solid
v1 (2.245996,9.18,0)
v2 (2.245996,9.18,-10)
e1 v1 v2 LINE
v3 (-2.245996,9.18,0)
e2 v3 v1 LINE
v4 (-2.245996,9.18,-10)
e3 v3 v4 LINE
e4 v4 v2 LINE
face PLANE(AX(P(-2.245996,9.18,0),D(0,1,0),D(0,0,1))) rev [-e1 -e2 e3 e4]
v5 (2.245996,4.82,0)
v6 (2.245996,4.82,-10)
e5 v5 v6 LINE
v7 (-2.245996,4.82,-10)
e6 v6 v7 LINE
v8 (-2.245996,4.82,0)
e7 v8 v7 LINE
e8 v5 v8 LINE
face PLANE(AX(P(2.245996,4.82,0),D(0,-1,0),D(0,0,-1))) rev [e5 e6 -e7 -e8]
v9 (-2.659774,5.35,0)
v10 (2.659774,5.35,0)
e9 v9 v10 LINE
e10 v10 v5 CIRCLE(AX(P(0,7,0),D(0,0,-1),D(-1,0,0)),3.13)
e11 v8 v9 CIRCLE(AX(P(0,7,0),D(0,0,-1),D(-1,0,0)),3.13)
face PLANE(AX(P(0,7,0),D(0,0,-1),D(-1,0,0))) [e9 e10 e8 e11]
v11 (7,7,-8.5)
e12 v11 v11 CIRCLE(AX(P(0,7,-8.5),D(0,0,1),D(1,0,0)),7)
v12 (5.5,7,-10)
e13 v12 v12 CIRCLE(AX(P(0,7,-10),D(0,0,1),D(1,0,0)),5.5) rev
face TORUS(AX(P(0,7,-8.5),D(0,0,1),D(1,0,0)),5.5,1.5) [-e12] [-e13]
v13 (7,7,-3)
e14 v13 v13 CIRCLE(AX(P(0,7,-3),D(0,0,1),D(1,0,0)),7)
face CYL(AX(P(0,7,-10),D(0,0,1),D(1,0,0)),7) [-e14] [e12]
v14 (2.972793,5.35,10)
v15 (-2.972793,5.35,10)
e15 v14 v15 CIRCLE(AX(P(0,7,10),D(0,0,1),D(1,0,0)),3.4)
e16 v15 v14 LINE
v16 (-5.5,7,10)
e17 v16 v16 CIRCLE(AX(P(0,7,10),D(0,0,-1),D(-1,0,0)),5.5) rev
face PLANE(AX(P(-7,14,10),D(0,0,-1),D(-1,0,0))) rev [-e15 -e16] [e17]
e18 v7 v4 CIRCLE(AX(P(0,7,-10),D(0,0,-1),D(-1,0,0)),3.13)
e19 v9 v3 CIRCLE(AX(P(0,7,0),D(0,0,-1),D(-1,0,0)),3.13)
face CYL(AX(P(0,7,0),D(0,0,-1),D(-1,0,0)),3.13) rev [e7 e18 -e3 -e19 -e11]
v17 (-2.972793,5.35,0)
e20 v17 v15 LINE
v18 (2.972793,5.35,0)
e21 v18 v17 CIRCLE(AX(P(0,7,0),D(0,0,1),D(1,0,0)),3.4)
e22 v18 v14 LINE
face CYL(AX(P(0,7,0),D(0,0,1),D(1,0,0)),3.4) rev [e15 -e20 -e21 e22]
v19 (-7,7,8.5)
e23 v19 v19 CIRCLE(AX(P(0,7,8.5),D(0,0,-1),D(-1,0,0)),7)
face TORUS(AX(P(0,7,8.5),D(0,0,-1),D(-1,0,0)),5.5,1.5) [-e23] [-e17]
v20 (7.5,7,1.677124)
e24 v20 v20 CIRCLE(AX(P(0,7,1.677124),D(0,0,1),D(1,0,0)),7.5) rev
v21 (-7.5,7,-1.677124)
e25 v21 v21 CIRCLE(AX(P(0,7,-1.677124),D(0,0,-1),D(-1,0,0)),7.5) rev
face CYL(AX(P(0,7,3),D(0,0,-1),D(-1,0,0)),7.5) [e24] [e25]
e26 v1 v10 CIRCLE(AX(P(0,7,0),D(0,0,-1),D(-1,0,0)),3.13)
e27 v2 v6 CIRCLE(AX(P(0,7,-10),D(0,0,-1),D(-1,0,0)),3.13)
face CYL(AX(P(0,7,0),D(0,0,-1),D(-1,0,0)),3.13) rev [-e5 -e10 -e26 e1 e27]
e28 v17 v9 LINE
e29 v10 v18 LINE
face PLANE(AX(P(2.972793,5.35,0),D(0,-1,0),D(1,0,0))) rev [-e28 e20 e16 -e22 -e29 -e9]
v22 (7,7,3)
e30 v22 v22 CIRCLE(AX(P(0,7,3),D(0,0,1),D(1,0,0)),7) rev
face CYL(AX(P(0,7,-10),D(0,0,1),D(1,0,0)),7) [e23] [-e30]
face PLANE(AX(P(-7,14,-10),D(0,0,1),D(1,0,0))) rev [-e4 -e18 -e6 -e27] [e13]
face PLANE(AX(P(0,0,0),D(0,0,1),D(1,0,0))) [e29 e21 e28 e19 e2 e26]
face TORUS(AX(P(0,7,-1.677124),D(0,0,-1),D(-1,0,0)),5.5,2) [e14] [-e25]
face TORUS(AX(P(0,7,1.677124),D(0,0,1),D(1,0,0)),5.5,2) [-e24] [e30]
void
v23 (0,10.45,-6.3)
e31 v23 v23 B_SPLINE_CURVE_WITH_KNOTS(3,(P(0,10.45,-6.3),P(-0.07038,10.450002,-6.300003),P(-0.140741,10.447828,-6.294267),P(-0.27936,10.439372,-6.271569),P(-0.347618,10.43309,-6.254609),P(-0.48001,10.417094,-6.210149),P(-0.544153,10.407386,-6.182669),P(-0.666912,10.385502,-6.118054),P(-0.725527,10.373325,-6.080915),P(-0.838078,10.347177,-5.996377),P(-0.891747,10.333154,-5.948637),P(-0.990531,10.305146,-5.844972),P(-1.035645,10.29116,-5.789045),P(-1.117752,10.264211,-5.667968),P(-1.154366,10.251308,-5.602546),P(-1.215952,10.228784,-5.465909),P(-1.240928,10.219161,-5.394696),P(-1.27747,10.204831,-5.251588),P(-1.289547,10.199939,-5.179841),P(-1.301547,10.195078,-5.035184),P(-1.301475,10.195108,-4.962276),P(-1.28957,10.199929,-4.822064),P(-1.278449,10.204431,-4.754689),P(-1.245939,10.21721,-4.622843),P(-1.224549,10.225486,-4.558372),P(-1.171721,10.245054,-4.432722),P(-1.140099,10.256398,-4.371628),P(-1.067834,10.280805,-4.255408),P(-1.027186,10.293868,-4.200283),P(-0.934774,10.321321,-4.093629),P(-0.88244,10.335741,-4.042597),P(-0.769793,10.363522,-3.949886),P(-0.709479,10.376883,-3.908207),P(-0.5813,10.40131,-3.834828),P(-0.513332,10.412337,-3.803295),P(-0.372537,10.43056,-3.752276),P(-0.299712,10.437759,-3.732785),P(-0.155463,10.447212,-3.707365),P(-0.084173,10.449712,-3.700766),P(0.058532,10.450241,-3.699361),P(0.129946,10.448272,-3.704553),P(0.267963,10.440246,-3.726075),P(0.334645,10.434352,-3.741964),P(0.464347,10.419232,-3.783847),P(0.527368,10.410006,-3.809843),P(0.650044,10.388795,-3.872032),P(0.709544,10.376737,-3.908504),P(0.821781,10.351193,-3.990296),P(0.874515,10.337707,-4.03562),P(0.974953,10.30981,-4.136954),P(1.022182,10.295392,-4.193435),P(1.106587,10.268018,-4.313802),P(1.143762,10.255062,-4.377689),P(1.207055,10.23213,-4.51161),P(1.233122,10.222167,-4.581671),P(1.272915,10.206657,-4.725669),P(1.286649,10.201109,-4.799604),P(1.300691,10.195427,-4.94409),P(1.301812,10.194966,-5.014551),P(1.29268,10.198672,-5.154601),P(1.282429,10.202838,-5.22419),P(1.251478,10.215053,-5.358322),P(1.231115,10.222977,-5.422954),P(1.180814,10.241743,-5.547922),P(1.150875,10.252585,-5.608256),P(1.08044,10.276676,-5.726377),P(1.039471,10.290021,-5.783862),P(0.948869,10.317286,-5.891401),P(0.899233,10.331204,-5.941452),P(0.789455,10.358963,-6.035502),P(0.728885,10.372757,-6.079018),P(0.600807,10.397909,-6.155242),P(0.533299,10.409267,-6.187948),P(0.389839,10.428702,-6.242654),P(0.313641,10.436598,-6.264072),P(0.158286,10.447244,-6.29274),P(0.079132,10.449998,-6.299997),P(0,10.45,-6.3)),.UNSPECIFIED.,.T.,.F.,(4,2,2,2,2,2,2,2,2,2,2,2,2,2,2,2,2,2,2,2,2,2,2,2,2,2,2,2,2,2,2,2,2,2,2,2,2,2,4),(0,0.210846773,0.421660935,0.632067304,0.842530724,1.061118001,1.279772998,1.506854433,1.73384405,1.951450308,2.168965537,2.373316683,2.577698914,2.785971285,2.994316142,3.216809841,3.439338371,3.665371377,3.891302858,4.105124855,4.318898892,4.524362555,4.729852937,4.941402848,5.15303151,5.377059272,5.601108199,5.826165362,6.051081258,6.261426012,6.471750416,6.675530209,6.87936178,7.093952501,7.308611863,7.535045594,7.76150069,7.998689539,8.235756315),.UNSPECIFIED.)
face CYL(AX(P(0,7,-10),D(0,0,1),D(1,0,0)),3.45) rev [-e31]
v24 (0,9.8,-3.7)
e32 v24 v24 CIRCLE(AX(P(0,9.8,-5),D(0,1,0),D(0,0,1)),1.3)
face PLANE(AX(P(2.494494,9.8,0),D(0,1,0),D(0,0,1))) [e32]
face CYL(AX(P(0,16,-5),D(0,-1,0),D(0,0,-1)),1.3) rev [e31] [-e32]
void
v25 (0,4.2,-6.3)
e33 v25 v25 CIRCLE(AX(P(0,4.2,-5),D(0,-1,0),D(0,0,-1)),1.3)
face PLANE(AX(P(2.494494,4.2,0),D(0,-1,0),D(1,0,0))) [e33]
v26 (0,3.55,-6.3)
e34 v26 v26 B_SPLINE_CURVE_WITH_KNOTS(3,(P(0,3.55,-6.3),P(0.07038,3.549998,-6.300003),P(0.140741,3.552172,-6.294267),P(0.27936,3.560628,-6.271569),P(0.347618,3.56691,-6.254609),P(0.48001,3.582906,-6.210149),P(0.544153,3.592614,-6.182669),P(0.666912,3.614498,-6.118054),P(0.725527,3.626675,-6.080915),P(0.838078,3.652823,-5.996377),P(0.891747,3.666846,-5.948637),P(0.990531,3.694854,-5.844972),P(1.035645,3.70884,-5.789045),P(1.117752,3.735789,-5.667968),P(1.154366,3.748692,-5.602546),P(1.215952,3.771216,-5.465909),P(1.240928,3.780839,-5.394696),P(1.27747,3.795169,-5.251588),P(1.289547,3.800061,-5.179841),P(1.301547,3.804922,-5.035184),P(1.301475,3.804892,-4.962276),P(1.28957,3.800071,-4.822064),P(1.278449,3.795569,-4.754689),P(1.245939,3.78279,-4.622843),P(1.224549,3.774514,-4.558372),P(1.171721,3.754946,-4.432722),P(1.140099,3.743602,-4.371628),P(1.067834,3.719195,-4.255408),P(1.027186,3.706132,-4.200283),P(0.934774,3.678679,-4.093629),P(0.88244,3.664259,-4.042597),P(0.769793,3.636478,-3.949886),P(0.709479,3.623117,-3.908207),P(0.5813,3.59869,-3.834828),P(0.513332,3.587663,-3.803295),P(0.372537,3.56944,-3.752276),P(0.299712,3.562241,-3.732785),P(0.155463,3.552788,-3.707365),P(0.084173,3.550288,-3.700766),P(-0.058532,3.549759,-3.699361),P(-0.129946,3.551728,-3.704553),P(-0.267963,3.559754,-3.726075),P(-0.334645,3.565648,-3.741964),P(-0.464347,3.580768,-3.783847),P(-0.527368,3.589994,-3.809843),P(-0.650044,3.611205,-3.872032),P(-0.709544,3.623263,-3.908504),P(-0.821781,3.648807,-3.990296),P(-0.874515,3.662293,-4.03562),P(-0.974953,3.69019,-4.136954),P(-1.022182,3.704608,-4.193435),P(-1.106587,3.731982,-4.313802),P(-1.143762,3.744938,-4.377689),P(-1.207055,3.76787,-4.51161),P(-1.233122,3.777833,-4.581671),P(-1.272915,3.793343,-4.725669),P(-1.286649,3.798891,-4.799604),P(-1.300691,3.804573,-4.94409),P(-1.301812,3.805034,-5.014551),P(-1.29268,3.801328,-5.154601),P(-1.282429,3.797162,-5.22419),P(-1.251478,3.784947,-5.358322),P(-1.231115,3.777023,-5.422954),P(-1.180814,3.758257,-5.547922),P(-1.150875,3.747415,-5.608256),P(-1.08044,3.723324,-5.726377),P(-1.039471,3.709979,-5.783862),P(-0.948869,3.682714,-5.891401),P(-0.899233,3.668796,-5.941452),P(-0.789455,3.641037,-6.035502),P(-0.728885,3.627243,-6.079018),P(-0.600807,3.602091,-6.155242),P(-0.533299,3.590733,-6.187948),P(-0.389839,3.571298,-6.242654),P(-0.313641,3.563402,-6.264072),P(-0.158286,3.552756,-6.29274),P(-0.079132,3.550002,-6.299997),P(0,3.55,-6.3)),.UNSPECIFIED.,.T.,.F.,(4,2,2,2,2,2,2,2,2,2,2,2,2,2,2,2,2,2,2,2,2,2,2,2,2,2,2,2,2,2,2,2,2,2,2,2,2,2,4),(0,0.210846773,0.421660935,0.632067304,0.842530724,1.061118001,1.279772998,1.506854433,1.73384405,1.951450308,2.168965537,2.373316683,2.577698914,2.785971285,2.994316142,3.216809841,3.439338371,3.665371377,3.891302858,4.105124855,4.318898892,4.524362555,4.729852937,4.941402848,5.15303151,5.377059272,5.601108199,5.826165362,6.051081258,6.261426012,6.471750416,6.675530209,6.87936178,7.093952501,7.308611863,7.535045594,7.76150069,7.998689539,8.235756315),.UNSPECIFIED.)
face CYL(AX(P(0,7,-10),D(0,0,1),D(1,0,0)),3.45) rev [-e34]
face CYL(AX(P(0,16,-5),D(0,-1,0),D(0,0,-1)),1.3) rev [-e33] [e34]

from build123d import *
from build123d.topology import SkipClean

# Parameters (mm, degrees)
ESBO_O1_W                  = 14
ESBO_O1_H                  = 20
ESBO_O1_R                  = 1.25
RESSALTO_EXTRUS_O1_DEPTH   = 14
ESBO_O6_R                  = 2.75
CORTE_EXTRUS_O3_DEPTH      = 10
CORTE_EXTRUS_O5_DEPTH      = 10
CORTE_EXTRUS_O5_DEPTH_BACK = 10
ESBO_O3_R                  = 1.25
ESBO_O8_R                  = 3.05
CORTE_EXTRUS_O6_DEPTH      = 10
ESBO_O9_OUTSIDE_W          = 21.628
ESBO_O9_OUTSIDE_H          = 21.628
ESBO_O9_OUTSIDE_R          = 7
CORTE_EXTRUS_O7_DEPTH      = 26.396850332
RESSALTO_EXTRUS_O2_START   = -6.122497316
RESSALTO_EXTRUS_O2_DEPTH   = 2.244994532
RESSALTO_EXTRUS_O3_DEPTH   = 10
ESBO_O13_R                 = 1.3
CORTE_EXTRUS_O8_DEPTH      = 16
RESSALTO_EXTRUS_O4_DEPTH   = 10
ESBO_O15_R                 = 1.3
CORTE_EXTRUS_O9_DEPTH      = 7
ESBO_O16_R                 = 7.5
ESBO_O16_R_2               = 7
RESSALTO_EXTRUS_O5_DEPTH   = 3
FILETE2_R                  = 2
FILETE3_R                  = 2
RESSALTO_EXTRUS_O6_START   = 10
RESSALTO_EXTRUS_O6_DEPTH   = 10
CORTE_EXTRUS_O11_DEPTH     = 10
CORTE_EXTRUS_O12_DEPTH     = 10
RESSALTO_EXTRUS_O8_DEPTH   = 10
RESSALTO_EXTRUS_O9_DEPTH   = 10
RESSALTO_EXTRUS_O10_DEPTH  = 10
ESBO_O26_R                 = 7
ESBO_O26_R_2               = 3.45
RESSALTO_EXTRUS_O11_DEPTH  = 20
FILETE4_R                  = 1.5
FILETE5_R                  = 1.5
ESBO_O27_W                 = 5.34202784
ESBO_O27_H                 = 3.157877353
RESSALTO_EXTRUS_O12_DEPTH  = 8


# Read off the part's stored shape, not the designer's step: Ressalto-extrusão2
with BuildPart() as part:
    # Esboço1 → Ressalto-extrusão1 (new body)
    with BuildSketch(Plane(origin=(0, 0, 0), x_dir=(1, 0, 0), z_dir=(0, 1, 0))):
        Rectangle(ESBO_O1_W, ESBO_O1_H)
        with Locations(Location((0, 5, 0), (0, 0, 270))):
            Circle(ESBO_O1_R, mode=Mode.SUBTRACT)
    extrude(amount=RESSALTO_EXTRUS_O1_DEPTH)

    # Esboço6 → Corte-extrusão3 (cut)
    with BuildSketch(Plane(origin=(0, 0, -10), x_dir=(-1, 0, 0), z_dir=(0, 0, -1))):
        with Locations((0, 7)):
            Circle(ESBO_O6_R)
    extrude(amount=-CORTE_EXTRUS_O3_DEPTH, mode=Mode.SUBTRACT)

    # Esboço3 → Corte-extrusão5 (cut, two sides: drawn at the far end of the back side and taken through both)
    with BuildSketch(Plane(origin=(0, 0, 0), x_dir=(1, 0, 0), z_dir=(0, 1, 0)).offset(-CORTE_EXTRUS_O5_DEPTH_BACK)):
        with Locations(Location((0, -5, 0), (0, 0, 270))):
            Circle(ESBO_O3_R)
    extrude(amount=CORTE_EXTRUS_O5_DEPTH + CORTE_EXTRUS_O5_DEPTH_BACK, mode=Mode.SUBTRACT)

    # Esboço8 → Corte-extrusão6 (cut)
    with BuildSketch(Plane.XY.offset(10)):
        with Locations((0, 7)):
            Circle(ESBO_O8_R)
    extrude(amount=-CORTE_EXTRUS_O6_DEPTH, mode=Mode.SUBTRACT)

    # Esboço9 outside → Corte-extrusão7 (cut, through all)
    with BuildSketch(Plane.XY.offset(10)):
        with Locations((0, 7)):
            Rectangle(ESBO_O9_OUTSIDE_W, ESBO_O9_OUTSIDE_H)
        with Locations((0, 7)):
            Circle(ESBO_O9_OUTSIDE_R, mode=Mode.SUBTRACT)
    extrude(amount=-CORTE_EXTRUS_O7_DEPTH, mode=Mode.SUBTRACT)

    # Ressalto-extrusão2 outline → Ressalto-extrusão2 (add)
    with SkipClean():  # the faces are left unmerged after this step: merging them gives an invalid solid
        with BuildSketch(Plane.XY.offset(10).offset(RESSALTO_EXTRUS_O2_START)):
            with BuildLine():
                ThreePointArc((0.55, 10), (2.343074903, 8.952562419), (3.05, 7))
                Line((3.05, 7), (7, 7))
                ThreePointArc((7, 7), (0, 14), (-7, 7))
                Line((-7, 7), (-3.05, 7))
                ThreePointArc((-3.05, 7), (-2.343074903, 8.952562419), (-0.55, 10))
                ThreePointArc((-0.55, 10), (0, 10.05), (0.55, 10))
            make_face()
        extrude(amount=RESSALTO_EXTRUS_O2_DEPTH)

    # Esboço11 → Ressalto-extrusão3 (add)
    with SkipClean():  # the faces are left unmerged after this step: merging them gives an invalid solid
        with BuildSketch(Plane(origin=(0, 0, -10), x_dir=(-1, 0, 0), z_dir=(0, 0, -1))):
            with BuildLine():
                Line((2.079062289, 5.2), (-2.079062289, 5.2))
                ThreePointArc((-2.079062289, 5.2), (0, 4.25), (2.079062289, 5.2))
            make_face()
            with BuildLine():
                ThreePointArc((2.079062289, 8.8), (0, 9.75), (-2.079062289, 8.8))
                Line((-2.079062289, 8.8), (2.079062289, 8.8))
            make_face()
        extrude(amount=-RESSALTO_EXTRUS_O3_DEPTH)

    # Esboço13 → Corte-extrusão8 (cut)
    with BuildSketch(Plane(origin=(0, 0, 0), x_dir=(1, 0, 0), z_dir=(0, 1, 0))):
        with Locations(Location((0, 5, 0), (0, 0, 90))):
            Circle(ESBO_O13_R)
    extrude(amount=CORTE_EXTRUS_O8_DEPTH, mode=Mode.SUBTRACT)

    # Esboço14 → Ressalto-extrusão4 (add)
    with BuildSketch(Plane.XY.offset(10)):
        with BuildLine():
            Line((0, 3.95), (0, 4.95))
            Line((0, 4.95), (-2.258317958, 4.95))
            ThreePointArc((-2.258317958, 4.95), (-1.234908904, 4.211183047), (0, 3.95))
        make_face()
        with BuildLine():
            Line((2.258317958, 4.95), (0, 4.95))
            Line((0, 4.95), (0, 3.95))
            ThreePointArc((0, 3.95), (1.234908904, 4.211183047), (2.258317958, 4.95))
        make_face()
    extrude(amount=-RESSALTO_EXTRUS_O4_DEPTH)

    # Esboço15 → Corte-extrusão9 (cut)
    with BuildSketch(Plane(origin=(0, 0, 0), x_dir=(1, 0, 0), z_dir=(0, 1, 0))):
        with Locations(Location((0, -5, 0), (0, 0, 90))):
            Circle(ESBO_O15_R)
    extrude(amount=CORTE_EXTRUS_O9_DEPTH, mode=Mode.SUBTRACT)

    # Esboço16 → Ressalto-extrusão5 (add, symmetric)
    with BuildSketch(Plane.XY):
        with Locations((0, 7)):
            Circle(ESBO_O16_R)
        with Locations((0, 7)):
            Circle(ESBO_O16_R_2, mode=Mode.SUBTRACT)
    extrude(amount=RESSALTO_EXTRUS_O5_DEPTH, both=True)

    # Filete2
    # the kernel refuses this fillet: 2 mm, written as the material it takes off along each edge
    with BuildSketch(Plane(origin=(0, 7, 3), x_dir=(1, 0, 0), z_dir=(0, -1, 0))) as filete2_piece_1:
        with BuildLine():
            CenterArc((5.5, -1.322875656), FILETE2_R, 0, 41.409622109)
            Line((7, 0), (7.03, 0.026457513))
            ThreePointArc((7.03, 0.026457513), (7.25, 0.04), (7.5, 0.04))
            Line((7.5, 0.04), (7.54, 0))
            Line((7.54, 0), (7.54, -1.322875656))
            Line((7.54, -1.322875656), (7.5, -1.322875656))
        make_face()
    revolve(axis=Axis((0, 7, 3), (0, 0, 1)), mode=Mode.SUBTRACT)

    # Filete3
    # the kernel refuses this fillet: 2 mm, written as the material it takes off along each edge
    with BuildSketch(Plane(origin=(0, 7, -3), x_dir=(1, 0, 0), z_dir=(0, -1, 0))) as filete3_piece_1:
        with BuildLine():
            CenterArc((5.5, 1.322875656), FILETE3_R, 318.590377891, 41.409622109)
            Line((7.5, 1.322875656), (7.54, 1.322875656))
            Line((7.54, 1.322875656), (7.54, 0))
            Line((7.54, 0), (7.5, -0.04))
            ThreePointArc((7.5, -0.04), (7.25, -0.04), (7.03, -0.026457513))
            Line((7.03, -0.026457513), (7, 0))
        make_face()
    revolve(axis=Axis((0, 7, -3), (0, 0, 1)), mode=Mode.SUBTRACT)

    # Esboço18 → Ressalto-extrusão6 (add)
    with BuildSketch(Plane.XY.offset(RESSALTO_EXTRUS_O6_START)):
        with BuildLine():
            Line((2.46221445, 5.2), (2.079062289, 5.2))
            Line((2.079062289, 5.2), (-2.079062289, 5.2))
            Line((-2.079062289, 5.2), (-2.46221445, 5.2))
            ThreePointArc((-2.46221445, 5.2), (-2.363573895, 5.072302294), (-2.258317958, 4.95))
            Line((-2.258317958, 4.95), (2.258317958, 4.95))
            ThreePointArc((2.258317958, 4.95), (2.363573895, 5.072302294), (2.46221445, 5.2))
        make_face()
    extrude(amount=-RESSALTO_EXTRUS_O6_DEPTH)

    # Esboço19 → Corte-extrusão11 (cut)
    with BuildSketch(Plane.XY.offset(10)):
        with BuildLine():
            ThreePointArc((-2.46221445, 5.2), (0, 10.05), (2.46221445, 5.2))
            Line((2.46221445, 5.2), (3.059820256, 5.2))
            ThreePointArc((3.059820256, 5.2), (0, 10.55), (-3.059820256, 5.2))
            Line((-3.059820256, 5.2), (-2.46221445, 5.2))
        make_face()
    extrude(amount=-CORTE_EXTRUS_O11_DEPTH, mode=Mode.SUBTRACT)

    # Esboço20 → Corte-extrusão12 (cut)
    with BuildSketch(Plane(origin=(0, 0, -10), x_dir=(-1, 0, 0), z_dir=(0, 0, -1))):
        with BuildLine():
            Line((-2.494493937, 4.2), (2.494493937, 4.2))
            ThreePointArc((2.494493937, 4.2), (3.75, 7), (2.494493937, 9.8))
            Line((2.494493937, 9.8), (-2.494493937, 9.8))
            ThreePointArc((-2.494493937, 9.8), (-3.75, 7), (-2.494493937, 4.2))
        make_face()
        with BuildLine():
            Line((-2.079062289, 8.8), (2.079062289, 8.8))
            ThreePointArc((2.079062289, 8.8), (2.75, 7), (2.079062289, 5.2))
            Line((2.079062289, 5.2), (-2.079062289, 5.2))
            ThreePointArc((-2.079062289, 5.2), (-2.75, 7), (-2.079062289, 8.8))
        make_face(mode=Mode.SUBTRACT)
    extrude(amount=-CORTE_EXTRUS_O12_DEPTH, mode=Mode.SUBTRACT)

    # Esboço23 → Ressalto-extrusão8 (add)
    with BuildSketch(Plane(origin=(0, 0, -10), x_dir=(-1, 0, 0), z_dir=(0, 0, -1))):
        with BuildLine():
            Line((-2.494493937, 4.2), (2.494493937, 4.2))
            ThreePointArc((2.494493937, 4.2), (3.75, 7), (2.494493937, 9.8))
            Line((2.494493937, 9.8), (-2.494493937, 9.8))
            ThreePointArc((-2.494493937, 9.8), (-3.75, 7), (-2.494493937, 4.2))
        make_face()
        with BuildLine():
            Line((-2.369493617, 9.48), (2.369493617, 9.48))
            ThreePointArc((2.369493617, 9.48), (3.43, 7), (2.369493617, 4.52))
            Line((2.369493617, 4.52), (-2.369493617, 4.52))
            ThreePointArc((-2.369493617, 4.52), (-3.43, 7), (-2.369493617, 9.48))
        make_face(mode=Mode.SUBTRACT)
    extrude(amount=-RESSALTO_EXTRUS_O8_DEPTH)

    # Esboço24 → Ressalto-extrusão9 (add)
    with BuildSketch(Plane.XY.offset(10)):
        with BuildLine():
            Line((3.059820256, 5.2), (-3.059820256, 5.2))
            ThreePointArc((-3.059820256, 5.2), (0, 10.55), (3.059820256, 5.2))
        make_face()
        with BuildLine():
            Line((2.972793299, 5.35), (-2.972793299, 5.35))
            ThreePointArc((-2.972793299, 5.35), (0, 10.4), (2.972793299, 5.35))
        make_face(mode=Mode.SUBTRACT)
    extrude(amount=-RESSALTO_EXTRUS_O9_DEPTH)

    # Esboço25 → Ressalto-extrusão10 (add)
    with BuildSketch(Plane(origin=(0, 0, -10), x_dir=(-1, 0, 0), z_dir=(0, 0, -1))):
        with BuildLine():
            Line((2.369493617, 9.48), (-2.369493617, 9.48))
            ThreePointArc((-2.369493617, 9.48), (-3.43, 7), (-2.369493617, 4.52))
            Line((-2.369493617, 4.52), (2.369493617, 4.52))
            ThreePointArc((2.369493617, 4.52), (3.43, 7), (2.369493617, 9.48))
        make_face()
        with BuildLine():
            Line((2.245996438, 9.18), (-2.245996438, 9.18))
            ThreePointArc((-2.245996438, 9.18), (-3.13, 7), (-2.245996438, 4.82))
            Line((-2.245996438, 4.82), (2.245996438, 4.82))
            ThreePointArc((2.245996438, 4.82), (3.13, 7), (2.245996438, 9.18))
        make_face(mode=Mode.SUBTRACT)
    extrude(amount=-RESSALTO_EXTRUS_O10_DEPTH)

    # Esboço26 → Ressalto-extrusão11 (add)
    with BuildSketch(Plane.XY.offset(10)):
        with Locations((0, 7)):
            Circle(ESBO_O26_R)
        with Locations((0, 7)):
            Circle(ESBO_O26_R_2, mode=Mode.SUBTRACT)
    extrude(amount=-RESSALTO_EXTRUS_O11_DEPTH)

    # Filete4
    filete4_edges = [part.edges().sort_by_distance(p)[0] for p in [
        (-7, 7, -10),
    ]]
    fillet(filete4_edges, radius=FILETE4_R)

    # Filete5
    filete5_edges = [part.edges().sort_by_distance(p)[0] for p in [
        (-7, 7, 10),
    ]]
    fillet(filete5_edges, radius=FILETE5_R)

    # Esboço27 → Ressalto-extrusão12 (add)
    with BuildSketch(Plane.XY.offset(10)):
        with Locations((0, 3.771061324)):
            Rectangle(ESBO_O27_W, ESBO_O27_H)
    extrude(amount=-RESSALTO_EXTRUS_O12_DEPTH)


solid = part.part
